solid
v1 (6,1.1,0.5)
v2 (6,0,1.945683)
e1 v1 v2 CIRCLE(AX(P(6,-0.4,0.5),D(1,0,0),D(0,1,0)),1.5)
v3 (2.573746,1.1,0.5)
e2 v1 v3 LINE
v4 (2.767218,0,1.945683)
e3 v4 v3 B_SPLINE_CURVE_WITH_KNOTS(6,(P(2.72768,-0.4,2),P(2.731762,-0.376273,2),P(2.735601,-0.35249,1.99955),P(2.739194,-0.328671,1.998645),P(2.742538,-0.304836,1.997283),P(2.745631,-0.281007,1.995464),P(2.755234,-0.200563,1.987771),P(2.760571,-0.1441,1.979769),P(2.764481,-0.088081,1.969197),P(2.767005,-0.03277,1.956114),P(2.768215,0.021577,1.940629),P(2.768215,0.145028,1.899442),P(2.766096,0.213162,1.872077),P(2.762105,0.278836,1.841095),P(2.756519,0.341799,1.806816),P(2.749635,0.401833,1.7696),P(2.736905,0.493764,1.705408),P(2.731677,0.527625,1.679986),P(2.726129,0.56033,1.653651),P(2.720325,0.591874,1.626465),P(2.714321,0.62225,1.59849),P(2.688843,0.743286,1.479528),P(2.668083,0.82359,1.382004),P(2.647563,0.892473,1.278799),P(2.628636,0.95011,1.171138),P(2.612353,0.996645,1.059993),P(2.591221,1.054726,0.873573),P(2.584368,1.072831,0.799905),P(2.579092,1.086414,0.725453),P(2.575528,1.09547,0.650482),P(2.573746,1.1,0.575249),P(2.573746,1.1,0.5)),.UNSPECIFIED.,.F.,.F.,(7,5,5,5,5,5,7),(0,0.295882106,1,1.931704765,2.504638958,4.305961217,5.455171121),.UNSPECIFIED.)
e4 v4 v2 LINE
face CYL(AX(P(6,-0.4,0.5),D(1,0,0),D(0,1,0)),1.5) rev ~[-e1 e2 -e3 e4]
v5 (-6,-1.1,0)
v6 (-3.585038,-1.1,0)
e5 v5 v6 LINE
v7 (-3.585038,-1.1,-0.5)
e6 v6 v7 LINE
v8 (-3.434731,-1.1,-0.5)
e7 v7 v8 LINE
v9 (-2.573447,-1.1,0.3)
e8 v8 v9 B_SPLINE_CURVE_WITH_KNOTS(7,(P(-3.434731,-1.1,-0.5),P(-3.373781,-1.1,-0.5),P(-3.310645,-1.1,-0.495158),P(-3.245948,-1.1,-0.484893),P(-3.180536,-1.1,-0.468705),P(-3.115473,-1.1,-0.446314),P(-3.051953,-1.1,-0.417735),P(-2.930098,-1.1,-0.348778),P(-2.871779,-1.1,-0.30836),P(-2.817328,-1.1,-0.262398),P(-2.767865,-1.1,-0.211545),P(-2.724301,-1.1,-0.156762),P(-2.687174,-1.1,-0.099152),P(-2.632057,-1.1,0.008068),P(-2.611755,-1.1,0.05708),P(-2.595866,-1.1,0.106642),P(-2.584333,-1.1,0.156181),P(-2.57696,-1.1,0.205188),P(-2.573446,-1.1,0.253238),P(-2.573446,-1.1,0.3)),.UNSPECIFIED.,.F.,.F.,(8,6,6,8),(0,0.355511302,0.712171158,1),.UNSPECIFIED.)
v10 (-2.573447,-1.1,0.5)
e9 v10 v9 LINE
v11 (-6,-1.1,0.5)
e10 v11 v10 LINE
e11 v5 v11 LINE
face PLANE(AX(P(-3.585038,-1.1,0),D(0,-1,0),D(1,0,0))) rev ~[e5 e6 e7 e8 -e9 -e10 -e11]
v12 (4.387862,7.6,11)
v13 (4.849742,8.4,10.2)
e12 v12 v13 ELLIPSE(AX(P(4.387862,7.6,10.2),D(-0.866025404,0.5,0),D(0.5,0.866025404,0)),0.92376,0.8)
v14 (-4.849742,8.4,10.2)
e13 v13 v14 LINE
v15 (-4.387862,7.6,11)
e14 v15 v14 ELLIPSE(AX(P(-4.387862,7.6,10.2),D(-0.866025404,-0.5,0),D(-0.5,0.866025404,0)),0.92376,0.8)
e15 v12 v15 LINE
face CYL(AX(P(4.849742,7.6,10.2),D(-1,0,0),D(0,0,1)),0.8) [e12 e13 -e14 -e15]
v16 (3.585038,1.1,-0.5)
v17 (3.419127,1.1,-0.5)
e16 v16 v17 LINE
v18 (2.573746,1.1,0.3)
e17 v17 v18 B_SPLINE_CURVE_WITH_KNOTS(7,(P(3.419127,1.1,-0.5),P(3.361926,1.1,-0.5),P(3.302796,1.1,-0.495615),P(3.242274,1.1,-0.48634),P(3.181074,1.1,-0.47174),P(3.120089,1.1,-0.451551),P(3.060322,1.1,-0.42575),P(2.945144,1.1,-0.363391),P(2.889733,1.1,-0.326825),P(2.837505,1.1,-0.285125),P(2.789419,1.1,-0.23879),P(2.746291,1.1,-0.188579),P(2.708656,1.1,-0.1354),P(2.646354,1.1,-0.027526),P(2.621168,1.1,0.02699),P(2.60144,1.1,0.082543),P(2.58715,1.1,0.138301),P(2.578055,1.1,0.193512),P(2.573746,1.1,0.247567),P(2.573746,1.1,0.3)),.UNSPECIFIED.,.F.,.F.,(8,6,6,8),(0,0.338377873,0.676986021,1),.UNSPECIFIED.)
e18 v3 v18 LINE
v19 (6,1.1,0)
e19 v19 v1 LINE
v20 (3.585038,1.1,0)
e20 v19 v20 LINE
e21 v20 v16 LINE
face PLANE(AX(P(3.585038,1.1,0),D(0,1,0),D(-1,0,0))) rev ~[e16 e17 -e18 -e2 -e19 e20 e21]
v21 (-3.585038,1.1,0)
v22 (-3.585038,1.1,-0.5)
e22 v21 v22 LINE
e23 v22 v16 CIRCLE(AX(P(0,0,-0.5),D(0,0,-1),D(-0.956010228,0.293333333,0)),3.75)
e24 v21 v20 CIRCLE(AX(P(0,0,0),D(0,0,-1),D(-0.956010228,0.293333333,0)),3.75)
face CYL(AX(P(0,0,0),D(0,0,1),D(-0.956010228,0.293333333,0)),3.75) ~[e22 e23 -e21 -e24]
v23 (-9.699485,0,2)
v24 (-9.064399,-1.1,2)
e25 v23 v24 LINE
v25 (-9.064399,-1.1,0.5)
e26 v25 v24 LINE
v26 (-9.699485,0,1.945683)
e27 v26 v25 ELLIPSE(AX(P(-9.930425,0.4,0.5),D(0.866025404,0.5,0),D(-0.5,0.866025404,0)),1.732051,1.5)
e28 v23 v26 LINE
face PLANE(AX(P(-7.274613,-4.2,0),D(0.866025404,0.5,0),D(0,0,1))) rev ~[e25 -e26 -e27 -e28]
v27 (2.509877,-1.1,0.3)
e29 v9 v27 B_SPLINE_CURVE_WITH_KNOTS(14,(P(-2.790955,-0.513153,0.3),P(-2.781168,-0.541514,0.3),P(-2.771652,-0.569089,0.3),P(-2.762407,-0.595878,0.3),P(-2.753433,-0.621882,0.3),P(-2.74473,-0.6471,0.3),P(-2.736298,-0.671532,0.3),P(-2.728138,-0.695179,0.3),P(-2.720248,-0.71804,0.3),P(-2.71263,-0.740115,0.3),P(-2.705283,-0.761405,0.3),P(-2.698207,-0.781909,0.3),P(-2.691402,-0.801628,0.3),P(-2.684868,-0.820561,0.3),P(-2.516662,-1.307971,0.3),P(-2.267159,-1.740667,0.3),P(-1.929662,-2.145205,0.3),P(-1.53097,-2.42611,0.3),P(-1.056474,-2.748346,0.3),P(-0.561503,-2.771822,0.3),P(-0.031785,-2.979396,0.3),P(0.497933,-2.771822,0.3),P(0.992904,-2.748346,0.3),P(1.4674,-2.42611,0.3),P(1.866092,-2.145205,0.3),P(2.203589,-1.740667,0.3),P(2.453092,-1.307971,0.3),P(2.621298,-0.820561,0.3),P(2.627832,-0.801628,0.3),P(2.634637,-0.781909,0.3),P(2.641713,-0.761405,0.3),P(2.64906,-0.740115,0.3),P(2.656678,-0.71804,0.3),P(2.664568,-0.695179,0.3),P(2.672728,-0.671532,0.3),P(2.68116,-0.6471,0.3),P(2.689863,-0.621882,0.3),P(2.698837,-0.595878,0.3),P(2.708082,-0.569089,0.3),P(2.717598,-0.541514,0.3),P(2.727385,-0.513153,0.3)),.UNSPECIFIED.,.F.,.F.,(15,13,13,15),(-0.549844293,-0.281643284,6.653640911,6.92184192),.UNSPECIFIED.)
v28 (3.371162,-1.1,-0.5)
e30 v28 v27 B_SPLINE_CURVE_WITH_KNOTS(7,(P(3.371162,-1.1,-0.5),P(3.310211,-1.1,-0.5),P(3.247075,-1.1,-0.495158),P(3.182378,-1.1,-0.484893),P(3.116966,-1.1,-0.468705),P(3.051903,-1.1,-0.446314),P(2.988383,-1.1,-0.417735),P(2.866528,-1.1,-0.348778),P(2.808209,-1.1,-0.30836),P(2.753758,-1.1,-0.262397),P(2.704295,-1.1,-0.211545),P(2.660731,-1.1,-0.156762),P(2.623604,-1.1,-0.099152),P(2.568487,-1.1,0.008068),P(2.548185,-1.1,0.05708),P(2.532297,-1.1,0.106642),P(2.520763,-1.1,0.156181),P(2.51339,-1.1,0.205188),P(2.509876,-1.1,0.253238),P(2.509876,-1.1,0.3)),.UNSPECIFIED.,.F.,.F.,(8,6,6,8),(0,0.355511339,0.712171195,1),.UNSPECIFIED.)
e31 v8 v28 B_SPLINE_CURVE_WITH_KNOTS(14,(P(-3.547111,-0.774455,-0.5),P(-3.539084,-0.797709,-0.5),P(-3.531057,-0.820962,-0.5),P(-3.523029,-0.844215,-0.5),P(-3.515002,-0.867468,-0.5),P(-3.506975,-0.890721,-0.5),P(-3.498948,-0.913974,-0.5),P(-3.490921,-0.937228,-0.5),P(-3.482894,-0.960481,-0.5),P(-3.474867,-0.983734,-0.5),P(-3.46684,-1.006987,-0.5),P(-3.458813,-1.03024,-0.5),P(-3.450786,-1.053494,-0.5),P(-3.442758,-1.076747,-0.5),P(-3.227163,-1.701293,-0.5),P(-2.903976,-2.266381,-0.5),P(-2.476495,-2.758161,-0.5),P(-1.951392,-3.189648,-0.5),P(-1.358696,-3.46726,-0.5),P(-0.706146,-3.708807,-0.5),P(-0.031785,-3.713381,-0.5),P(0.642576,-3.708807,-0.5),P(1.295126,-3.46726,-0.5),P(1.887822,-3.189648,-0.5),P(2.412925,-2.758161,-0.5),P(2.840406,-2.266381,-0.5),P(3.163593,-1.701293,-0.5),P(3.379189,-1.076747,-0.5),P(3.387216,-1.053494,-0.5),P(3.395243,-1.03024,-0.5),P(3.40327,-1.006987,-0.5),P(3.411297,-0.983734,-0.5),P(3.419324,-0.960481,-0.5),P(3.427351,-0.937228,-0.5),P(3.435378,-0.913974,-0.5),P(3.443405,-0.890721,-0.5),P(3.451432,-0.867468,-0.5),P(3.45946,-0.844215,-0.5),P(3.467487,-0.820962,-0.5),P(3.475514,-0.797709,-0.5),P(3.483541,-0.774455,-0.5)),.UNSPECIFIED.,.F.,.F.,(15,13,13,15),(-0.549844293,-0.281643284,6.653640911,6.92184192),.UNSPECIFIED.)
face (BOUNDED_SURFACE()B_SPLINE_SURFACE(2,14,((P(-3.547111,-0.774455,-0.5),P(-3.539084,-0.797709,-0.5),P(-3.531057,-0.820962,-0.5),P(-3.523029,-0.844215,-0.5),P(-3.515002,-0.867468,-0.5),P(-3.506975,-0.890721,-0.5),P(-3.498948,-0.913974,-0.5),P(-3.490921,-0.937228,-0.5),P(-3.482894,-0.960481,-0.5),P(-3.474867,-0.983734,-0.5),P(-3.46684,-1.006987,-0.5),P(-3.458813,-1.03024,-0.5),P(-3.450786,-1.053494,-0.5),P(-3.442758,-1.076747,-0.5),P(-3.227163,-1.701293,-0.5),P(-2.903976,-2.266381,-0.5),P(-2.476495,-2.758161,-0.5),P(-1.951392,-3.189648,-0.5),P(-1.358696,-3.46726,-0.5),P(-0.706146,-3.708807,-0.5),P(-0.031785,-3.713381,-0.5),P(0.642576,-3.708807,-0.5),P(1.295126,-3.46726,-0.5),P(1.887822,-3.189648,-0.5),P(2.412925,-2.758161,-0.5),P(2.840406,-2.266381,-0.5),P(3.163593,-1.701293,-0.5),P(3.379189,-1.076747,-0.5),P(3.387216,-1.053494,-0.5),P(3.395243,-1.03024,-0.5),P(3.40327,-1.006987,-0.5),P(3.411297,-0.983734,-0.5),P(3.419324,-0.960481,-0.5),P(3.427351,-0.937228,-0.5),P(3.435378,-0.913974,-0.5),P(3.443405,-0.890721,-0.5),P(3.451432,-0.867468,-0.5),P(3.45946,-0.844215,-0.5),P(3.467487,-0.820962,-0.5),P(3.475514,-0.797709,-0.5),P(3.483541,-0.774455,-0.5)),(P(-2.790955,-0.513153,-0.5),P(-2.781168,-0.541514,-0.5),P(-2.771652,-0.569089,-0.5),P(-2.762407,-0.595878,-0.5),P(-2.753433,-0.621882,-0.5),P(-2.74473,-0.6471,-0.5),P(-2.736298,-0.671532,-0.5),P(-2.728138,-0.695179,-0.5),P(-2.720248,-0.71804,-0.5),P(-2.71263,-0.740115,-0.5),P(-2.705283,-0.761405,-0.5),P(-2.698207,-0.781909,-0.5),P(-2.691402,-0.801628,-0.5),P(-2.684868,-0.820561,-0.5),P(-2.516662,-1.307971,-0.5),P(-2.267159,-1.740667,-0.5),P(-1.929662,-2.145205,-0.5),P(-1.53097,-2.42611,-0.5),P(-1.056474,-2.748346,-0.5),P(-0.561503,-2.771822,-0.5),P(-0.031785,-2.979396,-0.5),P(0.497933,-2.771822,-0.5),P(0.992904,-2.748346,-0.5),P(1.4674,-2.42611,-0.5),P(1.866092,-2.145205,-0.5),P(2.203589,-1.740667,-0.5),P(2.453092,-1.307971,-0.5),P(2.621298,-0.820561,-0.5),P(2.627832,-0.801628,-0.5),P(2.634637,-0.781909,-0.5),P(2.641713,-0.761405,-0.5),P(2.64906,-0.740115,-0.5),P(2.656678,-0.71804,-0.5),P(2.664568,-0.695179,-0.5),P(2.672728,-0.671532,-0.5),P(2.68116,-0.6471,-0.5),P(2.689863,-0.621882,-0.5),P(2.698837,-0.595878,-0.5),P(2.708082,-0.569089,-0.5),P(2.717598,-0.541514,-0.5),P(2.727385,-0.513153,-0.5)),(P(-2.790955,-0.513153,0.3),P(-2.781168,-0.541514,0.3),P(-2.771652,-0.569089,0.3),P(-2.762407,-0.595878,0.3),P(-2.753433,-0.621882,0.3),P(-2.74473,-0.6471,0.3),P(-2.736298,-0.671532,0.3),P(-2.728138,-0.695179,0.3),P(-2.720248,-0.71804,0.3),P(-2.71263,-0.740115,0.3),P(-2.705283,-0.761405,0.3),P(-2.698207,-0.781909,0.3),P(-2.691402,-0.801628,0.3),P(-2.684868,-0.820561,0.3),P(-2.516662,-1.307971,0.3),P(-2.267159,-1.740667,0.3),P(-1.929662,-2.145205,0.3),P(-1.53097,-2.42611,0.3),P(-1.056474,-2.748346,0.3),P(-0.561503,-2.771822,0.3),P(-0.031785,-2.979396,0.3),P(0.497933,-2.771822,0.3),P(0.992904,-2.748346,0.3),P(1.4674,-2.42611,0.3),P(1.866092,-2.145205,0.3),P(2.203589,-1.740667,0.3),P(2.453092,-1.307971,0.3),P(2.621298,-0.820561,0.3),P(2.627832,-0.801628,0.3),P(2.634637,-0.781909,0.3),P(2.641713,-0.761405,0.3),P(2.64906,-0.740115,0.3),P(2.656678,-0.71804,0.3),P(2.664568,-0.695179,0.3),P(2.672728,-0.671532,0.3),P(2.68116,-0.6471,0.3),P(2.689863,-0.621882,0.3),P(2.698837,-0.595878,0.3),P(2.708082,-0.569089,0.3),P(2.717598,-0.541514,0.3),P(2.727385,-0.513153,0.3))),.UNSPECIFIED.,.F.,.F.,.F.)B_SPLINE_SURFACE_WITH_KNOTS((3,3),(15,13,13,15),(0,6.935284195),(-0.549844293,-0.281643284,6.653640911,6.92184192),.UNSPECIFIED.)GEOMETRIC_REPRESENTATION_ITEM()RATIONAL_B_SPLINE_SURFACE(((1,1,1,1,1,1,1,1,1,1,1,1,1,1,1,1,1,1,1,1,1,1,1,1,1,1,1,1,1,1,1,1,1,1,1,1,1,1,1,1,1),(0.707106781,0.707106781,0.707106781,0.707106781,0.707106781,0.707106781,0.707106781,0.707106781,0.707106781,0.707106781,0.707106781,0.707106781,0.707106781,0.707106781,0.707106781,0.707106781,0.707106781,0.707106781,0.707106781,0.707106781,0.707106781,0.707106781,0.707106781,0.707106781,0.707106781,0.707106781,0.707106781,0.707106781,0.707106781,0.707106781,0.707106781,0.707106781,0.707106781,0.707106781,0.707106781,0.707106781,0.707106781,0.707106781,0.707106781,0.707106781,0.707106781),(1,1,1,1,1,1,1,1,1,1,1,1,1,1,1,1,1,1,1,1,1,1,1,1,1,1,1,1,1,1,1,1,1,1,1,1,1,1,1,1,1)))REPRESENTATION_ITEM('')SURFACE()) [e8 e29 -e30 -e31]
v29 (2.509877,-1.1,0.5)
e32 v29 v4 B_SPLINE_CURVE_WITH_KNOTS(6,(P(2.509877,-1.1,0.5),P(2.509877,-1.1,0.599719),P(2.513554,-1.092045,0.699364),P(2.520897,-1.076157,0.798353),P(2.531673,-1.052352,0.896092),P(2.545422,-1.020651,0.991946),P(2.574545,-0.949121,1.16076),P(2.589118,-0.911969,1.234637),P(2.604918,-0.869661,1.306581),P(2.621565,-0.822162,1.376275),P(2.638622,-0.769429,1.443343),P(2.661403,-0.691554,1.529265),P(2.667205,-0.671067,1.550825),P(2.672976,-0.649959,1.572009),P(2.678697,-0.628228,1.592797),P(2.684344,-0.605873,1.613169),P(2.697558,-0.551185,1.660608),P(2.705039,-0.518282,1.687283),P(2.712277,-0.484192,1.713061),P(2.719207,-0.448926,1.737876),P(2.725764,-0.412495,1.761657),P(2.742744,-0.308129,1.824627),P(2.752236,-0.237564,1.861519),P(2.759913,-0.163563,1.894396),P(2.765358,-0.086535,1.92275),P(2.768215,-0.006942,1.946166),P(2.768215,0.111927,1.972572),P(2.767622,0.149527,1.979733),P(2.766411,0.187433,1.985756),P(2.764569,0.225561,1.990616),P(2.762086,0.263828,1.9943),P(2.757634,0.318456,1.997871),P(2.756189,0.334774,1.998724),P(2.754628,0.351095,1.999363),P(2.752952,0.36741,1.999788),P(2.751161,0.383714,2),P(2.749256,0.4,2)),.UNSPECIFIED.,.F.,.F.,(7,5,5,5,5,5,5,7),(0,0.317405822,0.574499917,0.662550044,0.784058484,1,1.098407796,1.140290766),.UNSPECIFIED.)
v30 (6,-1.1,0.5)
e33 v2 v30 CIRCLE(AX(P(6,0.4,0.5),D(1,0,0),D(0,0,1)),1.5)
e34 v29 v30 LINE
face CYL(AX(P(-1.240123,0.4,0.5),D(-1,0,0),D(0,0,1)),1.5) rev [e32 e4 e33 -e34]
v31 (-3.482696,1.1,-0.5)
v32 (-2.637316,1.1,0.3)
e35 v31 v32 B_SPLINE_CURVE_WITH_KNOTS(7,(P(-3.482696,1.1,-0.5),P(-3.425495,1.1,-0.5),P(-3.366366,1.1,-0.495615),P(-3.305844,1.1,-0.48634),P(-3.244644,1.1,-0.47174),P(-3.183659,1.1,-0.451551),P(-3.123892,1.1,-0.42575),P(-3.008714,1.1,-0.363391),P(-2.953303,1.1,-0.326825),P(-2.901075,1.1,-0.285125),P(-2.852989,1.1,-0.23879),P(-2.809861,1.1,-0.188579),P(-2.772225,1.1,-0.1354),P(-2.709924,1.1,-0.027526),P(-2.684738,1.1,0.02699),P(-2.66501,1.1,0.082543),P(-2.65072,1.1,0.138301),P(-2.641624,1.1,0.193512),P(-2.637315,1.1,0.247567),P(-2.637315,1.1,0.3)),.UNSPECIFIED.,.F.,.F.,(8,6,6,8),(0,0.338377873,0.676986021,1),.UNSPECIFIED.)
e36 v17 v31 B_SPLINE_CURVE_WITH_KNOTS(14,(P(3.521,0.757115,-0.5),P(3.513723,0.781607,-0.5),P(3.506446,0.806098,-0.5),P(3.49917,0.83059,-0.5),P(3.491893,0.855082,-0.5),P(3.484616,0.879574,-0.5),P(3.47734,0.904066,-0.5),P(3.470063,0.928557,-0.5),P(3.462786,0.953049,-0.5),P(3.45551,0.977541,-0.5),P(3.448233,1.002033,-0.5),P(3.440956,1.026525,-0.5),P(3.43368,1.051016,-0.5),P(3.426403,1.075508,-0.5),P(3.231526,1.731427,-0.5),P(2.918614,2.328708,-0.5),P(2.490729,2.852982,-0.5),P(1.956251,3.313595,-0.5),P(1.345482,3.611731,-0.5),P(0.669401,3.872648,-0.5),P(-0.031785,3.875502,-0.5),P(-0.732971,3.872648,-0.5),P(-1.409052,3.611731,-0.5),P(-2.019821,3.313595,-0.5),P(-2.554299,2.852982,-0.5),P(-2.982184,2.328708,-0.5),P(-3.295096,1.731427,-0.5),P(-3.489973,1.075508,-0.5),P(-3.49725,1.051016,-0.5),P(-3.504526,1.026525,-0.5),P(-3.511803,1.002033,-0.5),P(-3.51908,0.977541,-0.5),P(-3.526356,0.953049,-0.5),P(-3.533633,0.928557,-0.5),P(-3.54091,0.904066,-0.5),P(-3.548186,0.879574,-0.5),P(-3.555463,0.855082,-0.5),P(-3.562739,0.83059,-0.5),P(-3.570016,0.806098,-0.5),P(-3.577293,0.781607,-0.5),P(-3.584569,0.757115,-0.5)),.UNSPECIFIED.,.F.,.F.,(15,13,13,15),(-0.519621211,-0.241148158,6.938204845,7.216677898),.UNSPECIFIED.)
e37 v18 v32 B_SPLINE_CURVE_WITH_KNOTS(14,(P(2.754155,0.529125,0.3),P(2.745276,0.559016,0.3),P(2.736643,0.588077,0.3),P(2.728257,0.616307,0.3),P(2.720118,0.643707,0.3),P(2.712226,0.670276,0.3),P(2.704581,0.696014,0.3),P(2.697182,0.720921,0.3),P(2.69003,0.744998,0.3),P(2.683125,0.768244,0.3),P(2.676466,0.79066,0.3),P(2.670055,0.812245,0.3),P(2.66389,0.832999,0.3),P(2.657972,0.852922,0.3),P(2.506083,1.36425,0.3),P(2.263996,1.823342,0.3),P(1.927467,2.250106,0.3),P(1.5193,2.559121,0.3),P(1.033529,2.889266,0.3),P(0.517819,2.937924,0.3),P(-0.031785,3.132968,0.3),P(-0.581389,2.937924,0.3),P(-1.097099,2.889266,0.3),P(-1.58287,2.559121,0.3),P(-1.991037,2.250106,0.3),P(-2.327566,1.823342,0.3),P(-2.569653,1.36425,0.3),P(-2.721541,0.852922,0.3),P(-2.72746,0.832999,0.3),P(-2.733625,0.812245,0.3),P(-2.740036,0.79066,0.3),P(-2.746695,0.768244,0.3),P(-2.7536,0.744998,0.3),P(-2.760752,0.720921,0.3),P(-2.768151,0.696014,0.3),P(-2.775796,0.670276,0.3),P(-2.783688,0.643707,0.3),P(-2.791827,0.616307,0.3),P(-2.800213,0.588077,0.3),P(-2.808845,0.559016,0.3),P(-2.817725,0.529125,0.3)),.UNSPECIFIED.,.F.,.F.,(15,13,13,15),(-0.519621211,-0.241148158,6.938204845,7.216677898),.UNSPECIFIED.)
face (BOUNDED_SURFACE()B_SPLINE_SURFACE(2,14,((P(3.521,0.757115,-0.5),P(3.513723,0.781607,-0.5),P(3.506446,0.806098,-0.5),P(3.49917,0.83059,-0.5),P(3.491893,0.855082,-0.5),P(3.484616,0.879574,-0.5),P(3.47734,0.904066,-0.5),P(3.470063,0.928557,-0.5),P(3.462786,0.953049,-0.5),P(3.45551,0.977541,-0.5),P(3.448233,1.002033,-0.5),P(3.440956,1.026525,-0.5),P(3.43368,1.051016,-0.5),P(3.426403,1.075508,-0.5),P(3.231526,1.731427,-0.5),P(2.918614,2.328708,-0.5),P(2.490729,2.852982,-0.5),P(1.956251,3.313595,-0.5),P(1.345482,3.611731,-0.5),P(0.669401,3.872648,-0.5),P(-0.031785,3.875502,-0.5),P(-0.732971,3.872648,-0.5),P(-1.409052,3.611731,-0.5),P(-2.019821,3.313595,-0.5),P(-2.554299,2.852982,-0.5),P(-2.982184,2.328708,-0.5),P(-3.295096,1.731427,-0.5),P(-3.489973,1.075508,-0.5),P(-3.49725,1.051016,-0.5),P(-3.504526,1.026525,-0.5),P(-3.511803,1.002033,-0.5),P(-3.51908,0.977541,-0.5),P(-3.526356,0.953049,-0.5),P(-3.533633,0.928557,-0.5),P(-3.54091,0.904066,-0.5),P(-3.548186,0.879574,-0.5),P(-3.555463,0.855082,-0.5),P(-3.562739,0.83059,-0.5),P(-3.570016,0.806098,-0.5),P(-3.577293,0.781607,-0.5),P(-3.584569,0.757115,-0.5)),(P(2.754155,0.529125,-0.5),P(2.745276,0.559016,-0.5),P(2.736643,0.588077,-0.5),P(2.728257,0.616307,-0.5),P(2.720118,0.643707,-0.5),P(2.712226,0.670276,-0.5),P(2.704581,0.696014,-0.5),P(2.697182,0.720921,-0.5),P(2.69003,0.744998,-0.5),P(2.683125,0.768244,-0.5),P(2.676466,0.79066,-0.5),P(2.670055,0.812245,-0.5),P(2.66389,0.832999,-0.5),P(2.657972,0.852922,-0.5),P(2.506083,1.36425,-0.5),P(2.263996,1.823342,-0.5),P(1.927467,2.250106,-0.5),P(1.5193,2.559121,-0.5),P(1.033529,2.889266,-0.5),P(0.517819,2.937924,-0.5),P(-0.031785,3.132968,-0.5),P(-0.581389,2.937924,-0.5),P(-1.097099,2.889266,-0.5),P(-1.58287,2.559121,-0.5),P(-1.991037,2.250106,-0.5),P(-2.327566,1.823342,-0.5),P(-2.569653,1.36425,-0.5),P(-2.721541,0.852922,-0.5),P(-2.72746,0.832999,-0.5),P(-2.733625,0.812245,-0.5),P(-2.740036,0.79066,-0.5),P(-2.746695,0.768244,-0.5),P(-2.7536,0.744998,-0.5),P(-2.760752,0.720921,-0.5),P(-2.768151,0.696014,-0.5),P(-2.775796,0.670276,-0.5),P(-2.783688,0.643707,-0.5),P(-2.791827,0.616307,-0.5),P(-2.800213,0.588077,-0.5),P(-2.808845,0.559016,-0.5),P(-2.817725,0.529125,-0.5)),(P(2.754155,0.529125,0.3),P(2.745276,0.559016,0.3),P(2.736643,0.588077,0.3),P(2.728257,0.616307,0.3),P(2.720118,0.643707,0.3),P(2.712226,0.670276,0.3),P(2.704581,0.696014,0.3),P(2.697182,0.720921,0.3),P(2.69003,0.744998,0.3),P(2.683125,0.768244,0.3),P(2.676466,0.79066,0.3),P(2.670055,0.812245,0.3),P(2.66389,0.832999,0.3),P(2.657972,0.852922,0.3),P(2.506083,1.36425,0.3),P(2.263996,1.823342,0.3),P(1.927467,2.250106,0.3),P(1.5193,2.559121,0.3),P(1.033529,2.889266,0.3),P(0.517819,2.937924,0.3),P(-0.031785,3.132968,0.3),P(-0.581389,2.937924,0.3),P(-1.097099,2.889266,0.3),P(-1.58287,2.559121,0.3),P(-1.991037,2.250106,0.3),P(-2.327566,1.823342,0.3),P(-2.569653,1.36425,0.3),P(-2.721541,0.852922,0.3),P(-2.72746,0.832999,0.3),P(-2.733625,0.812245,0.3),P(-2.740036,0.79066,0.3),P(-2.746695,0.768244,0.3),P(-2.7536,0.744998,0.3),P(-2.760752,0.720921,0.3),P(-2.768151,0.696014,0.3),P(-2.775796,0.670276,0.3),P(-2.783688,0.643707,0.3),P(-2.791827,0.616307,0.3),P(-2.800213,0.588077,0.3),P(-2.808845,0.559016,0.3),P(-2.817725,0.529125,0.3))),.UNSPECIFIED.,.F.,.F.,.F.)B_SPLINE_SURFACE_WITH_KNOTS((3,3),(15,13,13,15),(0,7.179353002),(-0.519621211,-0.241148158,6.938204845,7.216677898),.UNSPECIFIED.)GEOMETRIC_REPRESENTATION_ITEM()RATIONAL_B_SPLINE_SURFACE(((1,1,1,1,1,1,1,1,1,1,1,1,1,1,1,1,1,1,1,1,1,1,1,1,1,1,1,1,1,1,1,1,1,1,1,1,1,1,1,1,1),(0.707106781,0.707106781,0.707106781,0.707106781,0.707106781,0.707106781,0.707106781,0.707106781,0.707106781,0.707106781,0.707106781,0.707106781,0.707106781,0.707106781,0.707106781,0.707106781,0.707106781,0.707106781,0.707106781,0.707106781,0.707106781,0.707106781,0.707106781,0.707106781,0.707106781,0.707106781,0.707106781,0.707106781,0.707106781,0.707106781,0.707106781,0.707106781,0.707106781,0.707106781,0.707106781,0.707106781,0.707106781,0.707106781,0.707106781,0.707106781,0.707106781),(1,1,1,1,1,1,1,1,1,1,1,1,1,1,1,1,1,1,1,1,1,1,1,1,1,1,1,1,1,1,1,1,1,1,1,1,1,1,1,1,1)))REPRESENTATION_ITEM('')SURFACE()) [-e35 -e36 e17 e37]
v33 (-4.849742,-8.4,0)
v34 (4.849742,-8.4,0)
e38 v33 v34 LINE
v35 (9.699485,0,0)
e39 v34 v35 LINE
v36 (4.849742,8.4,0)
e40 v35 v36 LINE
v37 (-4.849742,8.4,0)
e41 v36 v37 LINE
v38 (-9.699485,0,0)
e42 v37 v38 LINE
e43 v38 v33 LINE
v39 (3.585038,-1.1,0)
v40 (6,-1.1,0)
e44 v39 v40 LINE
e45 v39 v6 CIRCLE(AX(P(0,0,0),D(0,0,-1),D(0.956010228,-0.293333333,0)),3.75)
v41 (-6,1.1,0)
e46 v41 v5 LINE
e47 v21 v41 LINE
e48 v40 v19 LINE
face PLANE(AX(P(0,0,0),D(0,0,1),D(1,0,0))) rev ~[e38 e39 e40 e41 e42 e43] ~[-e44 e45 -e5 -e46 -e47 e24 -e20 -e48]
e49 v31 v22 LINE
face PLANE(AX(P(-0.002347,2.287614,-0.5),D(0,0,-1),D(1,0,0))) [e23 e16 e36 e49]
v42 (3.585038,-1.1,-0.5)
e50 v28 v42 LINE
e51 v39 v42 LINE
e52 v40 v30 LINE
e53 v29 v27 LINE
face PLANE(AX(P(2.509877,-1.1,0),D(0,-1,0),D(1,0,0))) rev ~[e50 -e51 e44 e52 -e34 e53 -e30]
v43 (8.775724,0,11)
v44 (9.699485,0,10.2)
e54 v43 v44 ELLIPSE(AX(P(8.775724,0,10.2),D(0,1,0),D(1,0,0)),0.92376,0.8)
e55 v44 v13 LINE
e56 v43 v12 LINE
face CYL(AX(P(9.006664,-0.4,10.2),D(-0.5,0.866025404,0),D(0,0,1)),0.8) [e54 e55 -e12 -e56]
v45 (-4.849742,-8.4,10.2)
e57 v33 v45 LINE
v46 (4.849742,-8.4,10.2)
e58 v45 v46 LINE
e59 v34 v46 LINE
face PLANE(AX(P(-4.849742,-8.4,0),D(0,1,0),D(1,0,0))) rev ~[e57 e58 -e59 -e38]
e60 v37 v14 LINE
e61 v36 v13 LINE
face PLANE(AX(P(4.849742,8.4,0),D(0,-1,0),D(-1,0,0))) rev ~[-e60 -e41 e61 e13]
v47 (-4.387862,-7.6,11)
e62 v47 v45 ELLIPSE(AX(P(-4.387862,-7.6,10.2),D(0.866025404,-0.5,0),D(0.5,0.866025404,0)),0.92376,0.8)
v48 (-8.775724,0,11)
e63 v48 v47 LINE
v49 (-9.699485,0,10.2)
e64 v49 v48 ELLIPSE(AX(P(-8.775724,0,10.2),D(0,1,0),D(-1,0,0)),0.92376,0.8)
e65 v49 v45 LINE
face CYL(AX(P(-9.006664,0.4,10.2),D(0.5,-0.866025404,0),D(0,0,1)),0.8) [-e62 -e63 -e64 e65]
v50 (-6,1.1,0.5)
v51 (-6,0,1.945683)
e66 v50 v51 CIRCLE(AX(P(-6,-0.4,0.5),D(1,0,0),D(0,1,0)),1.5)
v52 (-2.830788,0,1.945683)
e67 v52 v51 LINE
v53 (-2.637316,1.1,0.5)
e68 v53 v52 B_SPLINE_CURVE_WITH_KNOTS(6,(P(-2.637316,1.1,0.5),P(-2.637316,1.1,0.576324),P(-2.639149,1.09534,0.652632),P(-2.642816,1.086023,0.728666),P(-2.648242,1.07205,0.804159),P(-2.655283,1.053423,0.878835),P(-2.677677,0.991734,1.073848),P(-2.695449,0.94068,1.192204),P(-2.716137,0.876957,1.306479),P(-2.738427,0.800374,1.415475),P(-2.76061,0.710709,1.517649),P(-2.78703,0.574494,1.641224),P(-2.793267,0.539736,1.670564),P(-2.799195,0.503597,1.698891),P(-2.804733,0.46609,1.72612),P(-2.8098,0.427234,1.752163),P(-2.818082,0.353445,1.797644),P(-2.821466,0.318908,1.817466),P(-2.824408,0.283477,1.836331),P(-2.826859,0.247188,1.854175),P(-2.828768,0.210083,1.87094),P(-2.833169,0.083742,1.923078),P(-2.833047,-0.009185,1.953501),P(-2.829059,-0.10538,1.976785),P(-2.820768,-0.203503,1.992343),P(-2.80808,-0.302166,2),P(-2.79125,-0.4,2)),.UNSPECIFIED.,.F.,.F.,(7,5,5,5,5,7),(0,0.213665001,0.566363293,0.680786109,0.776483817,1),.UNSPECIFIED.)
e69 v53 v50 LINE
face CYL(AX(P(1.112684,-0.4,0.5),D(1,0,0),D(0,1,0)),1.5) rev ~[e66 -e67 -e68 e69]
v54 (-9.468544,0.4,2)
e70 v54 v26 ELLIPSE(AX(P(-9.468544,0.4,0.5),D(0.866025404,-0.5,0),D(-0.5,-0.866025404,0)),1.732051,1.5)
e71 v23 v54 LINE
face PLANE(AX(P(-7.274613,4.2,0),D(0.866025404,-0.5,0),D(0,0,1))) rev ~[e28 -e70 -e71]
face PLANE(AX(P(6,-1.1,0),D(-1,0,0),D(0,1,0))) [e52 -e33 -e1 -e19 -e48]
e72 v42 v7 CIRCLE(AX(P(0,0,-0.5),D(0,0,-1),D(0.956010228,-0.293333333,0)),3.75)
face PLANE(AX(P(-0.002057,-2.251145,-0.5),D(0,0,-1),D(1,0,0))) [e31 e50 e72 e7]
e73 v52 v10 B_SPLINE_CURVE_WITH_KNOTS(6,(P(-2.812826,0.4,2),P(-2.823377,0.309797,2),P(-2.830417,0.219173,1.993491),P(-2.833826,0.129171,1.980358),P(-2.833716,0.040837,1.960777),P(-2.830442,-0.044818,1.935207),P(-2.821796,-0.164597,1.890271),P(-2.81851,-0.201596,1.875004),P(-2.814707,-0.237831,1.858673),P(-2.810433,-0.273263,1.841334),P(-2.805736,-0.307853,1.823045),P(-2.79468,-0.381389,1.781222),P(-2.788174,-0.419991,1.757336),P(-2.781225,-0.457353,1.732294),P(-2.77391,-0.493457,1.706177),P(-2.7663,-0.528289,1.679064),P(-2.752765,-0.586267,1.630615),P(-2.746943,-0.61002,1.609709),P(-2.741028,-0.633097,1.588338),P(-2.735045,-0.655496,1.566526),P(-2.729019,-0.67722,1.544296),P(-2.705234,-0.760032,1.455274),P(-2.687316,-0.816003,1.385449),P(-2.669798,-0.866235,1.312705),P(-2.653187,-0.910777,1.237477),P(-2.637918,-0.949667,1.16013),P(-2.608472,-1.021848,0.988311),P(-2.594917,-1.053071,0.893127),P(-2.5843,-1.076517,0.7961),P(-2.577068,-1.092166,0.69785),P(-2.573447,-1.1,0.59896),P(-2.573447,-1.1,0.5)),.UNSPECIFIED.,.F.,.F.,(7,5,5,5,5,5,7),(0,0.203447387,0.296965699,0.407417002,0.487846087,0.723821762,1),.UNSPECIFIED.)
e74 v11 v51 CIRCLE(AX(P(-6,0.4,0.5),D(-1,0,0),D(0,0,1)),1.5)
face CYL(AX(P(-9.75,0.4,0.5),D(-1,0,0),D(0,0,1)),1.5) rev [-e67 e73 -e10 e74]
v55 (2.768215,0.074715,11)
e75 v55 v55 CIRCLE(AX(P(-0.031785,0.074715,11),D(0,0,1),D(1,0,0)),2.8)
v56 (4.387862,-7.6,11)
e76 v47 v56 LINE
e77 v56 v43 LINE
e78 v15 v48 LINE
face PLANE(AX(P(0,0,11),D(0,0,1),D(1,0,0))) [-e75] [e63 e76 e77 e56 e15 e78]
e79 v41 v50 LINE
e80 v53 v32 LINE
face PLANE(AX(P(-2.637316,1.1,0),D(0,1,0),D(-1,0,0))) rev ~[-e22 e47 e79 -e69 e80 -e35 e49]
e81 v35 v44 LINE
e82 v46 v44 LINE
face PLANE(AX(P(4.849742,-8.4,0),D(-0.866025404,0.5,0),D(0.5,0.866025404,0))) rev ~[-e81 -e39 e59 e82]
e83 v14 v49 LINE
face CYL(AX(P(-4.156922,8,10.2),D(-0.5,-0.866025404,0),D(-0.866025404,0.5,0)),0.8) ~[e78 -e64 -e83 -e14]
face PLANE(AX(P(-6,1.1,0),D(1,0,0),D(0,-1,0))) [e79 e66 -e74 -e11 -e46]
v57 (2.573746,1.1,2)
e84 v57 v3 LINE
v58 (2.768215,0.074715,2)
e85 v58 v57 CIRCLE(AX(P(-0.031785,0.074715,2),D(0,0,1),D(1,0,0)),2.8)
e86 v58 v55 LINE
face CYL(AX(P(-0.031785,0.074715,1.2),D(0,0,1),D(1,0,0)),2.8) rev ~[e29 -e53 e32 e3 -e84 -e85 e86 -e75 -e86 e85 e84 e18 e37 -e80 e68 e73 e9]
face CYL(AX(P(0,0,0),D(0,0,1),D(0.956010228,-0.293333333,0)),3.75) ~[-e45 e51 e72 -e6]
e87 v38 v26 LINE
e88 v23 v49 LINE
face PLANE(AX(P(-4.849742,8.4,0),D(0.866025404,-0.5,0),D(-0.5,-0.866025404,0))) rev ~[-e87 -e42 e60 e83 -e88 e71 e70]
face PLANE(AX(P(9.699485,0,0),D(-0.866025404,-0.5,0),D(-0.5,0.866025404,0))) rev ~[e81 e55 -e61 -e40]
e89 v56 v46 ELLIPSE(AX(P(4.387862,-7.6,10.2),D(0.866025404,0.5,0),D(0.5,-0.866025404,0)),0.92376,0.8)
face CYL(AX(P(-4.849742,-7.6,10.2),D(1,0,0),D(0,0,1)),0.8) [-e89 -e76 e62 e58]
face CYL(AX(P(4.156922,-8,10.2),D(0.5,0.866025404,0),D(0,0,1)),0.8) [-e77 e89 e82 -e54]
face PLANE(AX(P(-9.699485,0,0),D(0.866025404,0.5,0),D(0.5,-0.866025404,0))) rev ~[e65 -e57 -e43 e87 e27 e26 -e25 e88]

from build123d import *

# Parameters (mm, degrees)
F0_R         = 2.8
F1_DEPTH     = 11
F3_DEPTH     = 2
F5_DEPTH     = 0.5
F6_DEPTH     = 0.5
F7_R         = 0.8
F8_T4_DEPTH  = 7.176254213
F8_S5_R      = 2.8
F8_T6_DEPTH  = 5
F8_T10_DEPTH = 7.240123034
F8_S11_R     = 2.8
F8_T12_DEPTH = 5
F8_T16_DEPTH = 10.9265531961
F8_S17_R     = 2.8
F8_T18_DEPTH = 7
F8_T24_DEPTH = 10.862684375
F8_S25_R     = 2.8
F8_T26_DEPTH = 7
F9_R         = 0.8


# Not quite as in the source:
# - a fillet or chamfer that OpenCascade refuses, or shapes differently, is made with other operations: its cross-section is extruded or revolved along the edge and cut away or added


with BuildPart() as f1:
    # F0 (on Top) → F1 (new body)
    with BuildSketch(Plane.XY):
        Polygon((4.8497422612, -8.4), (9.6994845224, 0), (4.8497422612, 8.4), (-4.8497422612, 8.4), (-9.6994845224, 0), (-4.8497422612, -8.4), align=None)
        with Locations((-0.031784919, 0.0747148006)):
            Circle(F0_R, mode=Mode.SUBTRACT)
    extrude(amount=F1_DEPTH)

    # F2 (on Top) → F3 (cut)
    with BuildSketch(Plane.XY):
        with BuildLine():
            Line((-6, 1.1), (-6, -1.1))
            Line((-6, -1.1), (-3.585038354, -1.1))
            ThreePointArc((-3.585038354, -1.1), (-3.75, 0), (-3.585038354, 1.1))
            Line((-3.585038354, 1.1), (-6, 1.1))
        make_face()
        with BuildLine():
            ThreePointArc((-3.585038354, 1.1), (-3.75, 0), (-3.585038354, -1.1))
            Line((-3.585038354, -1.1), (3.585038354, -1.1))
            ThreePointArc((3.585038354, -1.1), (3.7085302903, -0.556150237), (3.75, 0))
            ThreePointArc((3.75, 0), (3.7085302903, 0.556150237), (3.585038354, 1.1))
            Line((3.585038354, 1.1), (-3.585038354, 1.1))
        make_face()
        with BuildLine():
            ThreePointArc((3.75, 0), (3.7085302903, -0.556150237), (3.585038354, -1.1))
            Line((3.585038354, -1.1), (6, -1.1))
            Line((6, -1.1), (6, 1.1))
            Line((6, 1.1), (3.585038354, 1.1))
            ThreePointArc((3.585038354, 1.1), (3.7085302903, 0.556150237), (3.75, 0))
        make_face()
    extrude(amount=F3_DEPTH, mode=Mode.SUBTRACT)

    # F4 (on face) → F5 (join)
    with BuildSketch(Plane(origin=(0, 0, 0), x_dir=(1, 0, 0), z_dir=(0, 0, -1))):
        with BuildLine():
            Line((2.509876966, 1.1), (3.585038354, 1.1))
            ThreePointArc((3.585038354, 1.1), (0, 3.75), (-3.585038354, 1.1))
            Line((-3.585038354, 1.1), (-2.5734468039, 1.1))
            ThreePointArc((-2.5734468039, 1.1), (-0.031784919, 2.7252851994), (2.509876966, 1.1))
        make_face()
    extrude(amount=F5_DEPTH)

    # F4 (on face) → F6 (join)
    with BuildSketch(Plane(origin=(0, 0, 0), x_dir=(1, 0, 0), z_dir=(0, 0, -1))):
        with BuildLine():
            ThreePointArc((-3.585038354, -1.1), (0, -3.75), (3.585038354, -1.1))
            Line((3.585038354, -1.1), (2.573745787, -1.1))
            ThreePointArc((2.573745787, -1.1), (-0.031784919, -2.8747148006), (-2.637315625, -1.1))
            Line((-2.637315625, -1.1), (-3.585038354, -1.1))
        make_face()
    extrude(amount=F6_DEPTH)

    # F7
    f7_edges = [f1.edges().sort_by_distance(p)[0] for p in [
        (-0.031785, 2.874715, -0.5),
        (-0.031785, -2.725285, -0.5),
    ]]
    fillet(f7_edges, radius=F7_R)

    # F8: fillet of radius 1.5 on 4 edges, made by hand


with BuildPart() as f8_tool2:
    # F8_s3 → F8_t4 (new body)
    with BuildSketch(Plane.YZ.offset(6)):
        with BuildLine():
            ThreePointArc((1.1, 0.5), (0.6606601718, 1.5606601718), (-0.4, 2))
            Line((-0.4, 2), (1.1, 2))
            Line((1.1, 2), (1.1, 0.5))
        make_face()
    extrude(amount=-F8_T4_DEPTH)

    # F8_s5 → F8_t6 (cut, symmetric)
    with BuildSketch(Plane.XY.offset(1.2)):
        with Locations((-0.031784919, 0.0747148006)):
            Circle(F8_S5_R)
    extrude(amount=F8_T6_DEPTH, both=True, mode=Mode.SUBTRACT)


with BuildPart() as f1_1:
    add(f1.part)

    # F8_t1: union F8_tool2
    add(f8_tool2.part)


with BuildPart() as f8_tool8:
    # F8_s9 → F8_t10 (new body)
    with BuildSketch(Plane.YZ.offset(-1.240123034)):
        with BuildLine():
            ThreePointArc((0.4, 2), (-0.6606601718, 1.5606601718), (-1.1, 0.5))
            Line((-1.1, 0.5), (-1.1, 2))
            Line((-1.1, 2), (0.4, 2))
        make_face()
    extrude(amount=F8_T10_DEPTH)

    # F8_s11 → F8_t12 (cut, symmetric)
    with BuildSketch(Plane.XY.offset(1.2)):
        with Locations((-0.031784919, 0.0747148006)):
            Circle(F8_S11_R)
    extrude(amount=F8_T12_DEPTH, both=True, mode=Mode.SUBTRACT)


with BuildPart() as f1_2:
    add(f1_1.part)

    # F8_t7: union F8_tool8
    add(f8_tool8.part)


with BuildPart() as f8_tool14:
    # F8_s15 → F8_t16 (new body)
    with BuildSketch(Plane.YZ.offset(-9.75)):
        with BuildLine():
            ThreePointArc((0.4, 2), (-0.6606601718, 1.5606601718), (-1.1, 0.5))
            Line((-1.1, 0.5), (-1.1, 2))
            Line((-1.1, 2), (0.4, 2))
        make_face()
    extrude(amount=F8_T16_DEPTH)

    # F8_s17 → F8_t18 (cut, symmetric)
    with BuildSketch(Plane.XY.offset(1.2)):
        with Locations((-0.031784919, 0.0747148006)):
            Circle(F8_S17_R)
    extrude(amount=F8_T18_DEPTH, both=True, mode=Mode.SUBTRACT)

    split(bisect_by=Plane(origin=(-7.2746133918, -4.2, 0), x_dir=(0, 0, 1), z_dir=(0.8660254038, 0.5, 0)), keep=Keep.TOP)

    split(bisect_by=Plane(origin=(-7.2746133918, 4.2, 0), x_dir=(0, 0, 1), z_dir=(0.8660254038, -0.5, 0)), keep=Keep.TOP)


with BuildPart() as f1_3:
    add(f1_2.part)

    # F8_t13: union F8_tool14
    add(f8_tool14.part)


with BuildPart() as f8_tool22:
    # F8_s23 → F8_t24 (new body)
    with BuildSketch(Plane.YZ.offset(1.112684375)):
        with BuildLine():
            ThreePointArc((1.1, 0.5), (0.6606601718, 1.5606601718), (-0.4, 2))
            Line((-0.4, 2), (1.1, 2))
            Line((1.1, 2), (1.1, 0.5))
        make_face()
    extrude(amount=-F8_T24_DEPTH)

    # F8_s25 → F8_t26 (cut, symmetric)
    with BuildSketch(Plane.XY.offset(1.2)):
        with Locations((-0.031784919, 0.0747148006)):
            Circle(F8_S25_R)
    extrude(amount=F8_T26_DEPTH, both=True, mode=Mode.SUBTRACT)

    split(bisect_by=Plane(origin=(-7.2746133918, -4.2, 0), x_dir=(0, 0, 1), z_dir=(0.8660254038, 0.5, 0)), keep=Keep.TOP)

    split(bisect_by=Plane(origin=(-7.2746133918, 4.2, 0), x_dir=(0, 0, 1), z_dir=(0.8660254038, -0.5, 0)), keep=Keep.TOP)


with BuildPart() as f1_4:
    add(f1_3.part)

    # F8_t21: union F8_tool22
    add(f8_tool22.part)

    # F9
    f9_edges = [f1_4.edges().sort_by_distance(p)[0] for p in [
        (0, -8.4, 11),
        (7.274613, -4.2, 11),
        (7.274613, 4.2, 11),
        (0, 8.4, 11),
        (-7.274613, 4.2, 11),
        (-7.274613, -4.2, 11),
    ]]
    fillet(f9_edges, radius=F9_R)


solid = f1_4.part
